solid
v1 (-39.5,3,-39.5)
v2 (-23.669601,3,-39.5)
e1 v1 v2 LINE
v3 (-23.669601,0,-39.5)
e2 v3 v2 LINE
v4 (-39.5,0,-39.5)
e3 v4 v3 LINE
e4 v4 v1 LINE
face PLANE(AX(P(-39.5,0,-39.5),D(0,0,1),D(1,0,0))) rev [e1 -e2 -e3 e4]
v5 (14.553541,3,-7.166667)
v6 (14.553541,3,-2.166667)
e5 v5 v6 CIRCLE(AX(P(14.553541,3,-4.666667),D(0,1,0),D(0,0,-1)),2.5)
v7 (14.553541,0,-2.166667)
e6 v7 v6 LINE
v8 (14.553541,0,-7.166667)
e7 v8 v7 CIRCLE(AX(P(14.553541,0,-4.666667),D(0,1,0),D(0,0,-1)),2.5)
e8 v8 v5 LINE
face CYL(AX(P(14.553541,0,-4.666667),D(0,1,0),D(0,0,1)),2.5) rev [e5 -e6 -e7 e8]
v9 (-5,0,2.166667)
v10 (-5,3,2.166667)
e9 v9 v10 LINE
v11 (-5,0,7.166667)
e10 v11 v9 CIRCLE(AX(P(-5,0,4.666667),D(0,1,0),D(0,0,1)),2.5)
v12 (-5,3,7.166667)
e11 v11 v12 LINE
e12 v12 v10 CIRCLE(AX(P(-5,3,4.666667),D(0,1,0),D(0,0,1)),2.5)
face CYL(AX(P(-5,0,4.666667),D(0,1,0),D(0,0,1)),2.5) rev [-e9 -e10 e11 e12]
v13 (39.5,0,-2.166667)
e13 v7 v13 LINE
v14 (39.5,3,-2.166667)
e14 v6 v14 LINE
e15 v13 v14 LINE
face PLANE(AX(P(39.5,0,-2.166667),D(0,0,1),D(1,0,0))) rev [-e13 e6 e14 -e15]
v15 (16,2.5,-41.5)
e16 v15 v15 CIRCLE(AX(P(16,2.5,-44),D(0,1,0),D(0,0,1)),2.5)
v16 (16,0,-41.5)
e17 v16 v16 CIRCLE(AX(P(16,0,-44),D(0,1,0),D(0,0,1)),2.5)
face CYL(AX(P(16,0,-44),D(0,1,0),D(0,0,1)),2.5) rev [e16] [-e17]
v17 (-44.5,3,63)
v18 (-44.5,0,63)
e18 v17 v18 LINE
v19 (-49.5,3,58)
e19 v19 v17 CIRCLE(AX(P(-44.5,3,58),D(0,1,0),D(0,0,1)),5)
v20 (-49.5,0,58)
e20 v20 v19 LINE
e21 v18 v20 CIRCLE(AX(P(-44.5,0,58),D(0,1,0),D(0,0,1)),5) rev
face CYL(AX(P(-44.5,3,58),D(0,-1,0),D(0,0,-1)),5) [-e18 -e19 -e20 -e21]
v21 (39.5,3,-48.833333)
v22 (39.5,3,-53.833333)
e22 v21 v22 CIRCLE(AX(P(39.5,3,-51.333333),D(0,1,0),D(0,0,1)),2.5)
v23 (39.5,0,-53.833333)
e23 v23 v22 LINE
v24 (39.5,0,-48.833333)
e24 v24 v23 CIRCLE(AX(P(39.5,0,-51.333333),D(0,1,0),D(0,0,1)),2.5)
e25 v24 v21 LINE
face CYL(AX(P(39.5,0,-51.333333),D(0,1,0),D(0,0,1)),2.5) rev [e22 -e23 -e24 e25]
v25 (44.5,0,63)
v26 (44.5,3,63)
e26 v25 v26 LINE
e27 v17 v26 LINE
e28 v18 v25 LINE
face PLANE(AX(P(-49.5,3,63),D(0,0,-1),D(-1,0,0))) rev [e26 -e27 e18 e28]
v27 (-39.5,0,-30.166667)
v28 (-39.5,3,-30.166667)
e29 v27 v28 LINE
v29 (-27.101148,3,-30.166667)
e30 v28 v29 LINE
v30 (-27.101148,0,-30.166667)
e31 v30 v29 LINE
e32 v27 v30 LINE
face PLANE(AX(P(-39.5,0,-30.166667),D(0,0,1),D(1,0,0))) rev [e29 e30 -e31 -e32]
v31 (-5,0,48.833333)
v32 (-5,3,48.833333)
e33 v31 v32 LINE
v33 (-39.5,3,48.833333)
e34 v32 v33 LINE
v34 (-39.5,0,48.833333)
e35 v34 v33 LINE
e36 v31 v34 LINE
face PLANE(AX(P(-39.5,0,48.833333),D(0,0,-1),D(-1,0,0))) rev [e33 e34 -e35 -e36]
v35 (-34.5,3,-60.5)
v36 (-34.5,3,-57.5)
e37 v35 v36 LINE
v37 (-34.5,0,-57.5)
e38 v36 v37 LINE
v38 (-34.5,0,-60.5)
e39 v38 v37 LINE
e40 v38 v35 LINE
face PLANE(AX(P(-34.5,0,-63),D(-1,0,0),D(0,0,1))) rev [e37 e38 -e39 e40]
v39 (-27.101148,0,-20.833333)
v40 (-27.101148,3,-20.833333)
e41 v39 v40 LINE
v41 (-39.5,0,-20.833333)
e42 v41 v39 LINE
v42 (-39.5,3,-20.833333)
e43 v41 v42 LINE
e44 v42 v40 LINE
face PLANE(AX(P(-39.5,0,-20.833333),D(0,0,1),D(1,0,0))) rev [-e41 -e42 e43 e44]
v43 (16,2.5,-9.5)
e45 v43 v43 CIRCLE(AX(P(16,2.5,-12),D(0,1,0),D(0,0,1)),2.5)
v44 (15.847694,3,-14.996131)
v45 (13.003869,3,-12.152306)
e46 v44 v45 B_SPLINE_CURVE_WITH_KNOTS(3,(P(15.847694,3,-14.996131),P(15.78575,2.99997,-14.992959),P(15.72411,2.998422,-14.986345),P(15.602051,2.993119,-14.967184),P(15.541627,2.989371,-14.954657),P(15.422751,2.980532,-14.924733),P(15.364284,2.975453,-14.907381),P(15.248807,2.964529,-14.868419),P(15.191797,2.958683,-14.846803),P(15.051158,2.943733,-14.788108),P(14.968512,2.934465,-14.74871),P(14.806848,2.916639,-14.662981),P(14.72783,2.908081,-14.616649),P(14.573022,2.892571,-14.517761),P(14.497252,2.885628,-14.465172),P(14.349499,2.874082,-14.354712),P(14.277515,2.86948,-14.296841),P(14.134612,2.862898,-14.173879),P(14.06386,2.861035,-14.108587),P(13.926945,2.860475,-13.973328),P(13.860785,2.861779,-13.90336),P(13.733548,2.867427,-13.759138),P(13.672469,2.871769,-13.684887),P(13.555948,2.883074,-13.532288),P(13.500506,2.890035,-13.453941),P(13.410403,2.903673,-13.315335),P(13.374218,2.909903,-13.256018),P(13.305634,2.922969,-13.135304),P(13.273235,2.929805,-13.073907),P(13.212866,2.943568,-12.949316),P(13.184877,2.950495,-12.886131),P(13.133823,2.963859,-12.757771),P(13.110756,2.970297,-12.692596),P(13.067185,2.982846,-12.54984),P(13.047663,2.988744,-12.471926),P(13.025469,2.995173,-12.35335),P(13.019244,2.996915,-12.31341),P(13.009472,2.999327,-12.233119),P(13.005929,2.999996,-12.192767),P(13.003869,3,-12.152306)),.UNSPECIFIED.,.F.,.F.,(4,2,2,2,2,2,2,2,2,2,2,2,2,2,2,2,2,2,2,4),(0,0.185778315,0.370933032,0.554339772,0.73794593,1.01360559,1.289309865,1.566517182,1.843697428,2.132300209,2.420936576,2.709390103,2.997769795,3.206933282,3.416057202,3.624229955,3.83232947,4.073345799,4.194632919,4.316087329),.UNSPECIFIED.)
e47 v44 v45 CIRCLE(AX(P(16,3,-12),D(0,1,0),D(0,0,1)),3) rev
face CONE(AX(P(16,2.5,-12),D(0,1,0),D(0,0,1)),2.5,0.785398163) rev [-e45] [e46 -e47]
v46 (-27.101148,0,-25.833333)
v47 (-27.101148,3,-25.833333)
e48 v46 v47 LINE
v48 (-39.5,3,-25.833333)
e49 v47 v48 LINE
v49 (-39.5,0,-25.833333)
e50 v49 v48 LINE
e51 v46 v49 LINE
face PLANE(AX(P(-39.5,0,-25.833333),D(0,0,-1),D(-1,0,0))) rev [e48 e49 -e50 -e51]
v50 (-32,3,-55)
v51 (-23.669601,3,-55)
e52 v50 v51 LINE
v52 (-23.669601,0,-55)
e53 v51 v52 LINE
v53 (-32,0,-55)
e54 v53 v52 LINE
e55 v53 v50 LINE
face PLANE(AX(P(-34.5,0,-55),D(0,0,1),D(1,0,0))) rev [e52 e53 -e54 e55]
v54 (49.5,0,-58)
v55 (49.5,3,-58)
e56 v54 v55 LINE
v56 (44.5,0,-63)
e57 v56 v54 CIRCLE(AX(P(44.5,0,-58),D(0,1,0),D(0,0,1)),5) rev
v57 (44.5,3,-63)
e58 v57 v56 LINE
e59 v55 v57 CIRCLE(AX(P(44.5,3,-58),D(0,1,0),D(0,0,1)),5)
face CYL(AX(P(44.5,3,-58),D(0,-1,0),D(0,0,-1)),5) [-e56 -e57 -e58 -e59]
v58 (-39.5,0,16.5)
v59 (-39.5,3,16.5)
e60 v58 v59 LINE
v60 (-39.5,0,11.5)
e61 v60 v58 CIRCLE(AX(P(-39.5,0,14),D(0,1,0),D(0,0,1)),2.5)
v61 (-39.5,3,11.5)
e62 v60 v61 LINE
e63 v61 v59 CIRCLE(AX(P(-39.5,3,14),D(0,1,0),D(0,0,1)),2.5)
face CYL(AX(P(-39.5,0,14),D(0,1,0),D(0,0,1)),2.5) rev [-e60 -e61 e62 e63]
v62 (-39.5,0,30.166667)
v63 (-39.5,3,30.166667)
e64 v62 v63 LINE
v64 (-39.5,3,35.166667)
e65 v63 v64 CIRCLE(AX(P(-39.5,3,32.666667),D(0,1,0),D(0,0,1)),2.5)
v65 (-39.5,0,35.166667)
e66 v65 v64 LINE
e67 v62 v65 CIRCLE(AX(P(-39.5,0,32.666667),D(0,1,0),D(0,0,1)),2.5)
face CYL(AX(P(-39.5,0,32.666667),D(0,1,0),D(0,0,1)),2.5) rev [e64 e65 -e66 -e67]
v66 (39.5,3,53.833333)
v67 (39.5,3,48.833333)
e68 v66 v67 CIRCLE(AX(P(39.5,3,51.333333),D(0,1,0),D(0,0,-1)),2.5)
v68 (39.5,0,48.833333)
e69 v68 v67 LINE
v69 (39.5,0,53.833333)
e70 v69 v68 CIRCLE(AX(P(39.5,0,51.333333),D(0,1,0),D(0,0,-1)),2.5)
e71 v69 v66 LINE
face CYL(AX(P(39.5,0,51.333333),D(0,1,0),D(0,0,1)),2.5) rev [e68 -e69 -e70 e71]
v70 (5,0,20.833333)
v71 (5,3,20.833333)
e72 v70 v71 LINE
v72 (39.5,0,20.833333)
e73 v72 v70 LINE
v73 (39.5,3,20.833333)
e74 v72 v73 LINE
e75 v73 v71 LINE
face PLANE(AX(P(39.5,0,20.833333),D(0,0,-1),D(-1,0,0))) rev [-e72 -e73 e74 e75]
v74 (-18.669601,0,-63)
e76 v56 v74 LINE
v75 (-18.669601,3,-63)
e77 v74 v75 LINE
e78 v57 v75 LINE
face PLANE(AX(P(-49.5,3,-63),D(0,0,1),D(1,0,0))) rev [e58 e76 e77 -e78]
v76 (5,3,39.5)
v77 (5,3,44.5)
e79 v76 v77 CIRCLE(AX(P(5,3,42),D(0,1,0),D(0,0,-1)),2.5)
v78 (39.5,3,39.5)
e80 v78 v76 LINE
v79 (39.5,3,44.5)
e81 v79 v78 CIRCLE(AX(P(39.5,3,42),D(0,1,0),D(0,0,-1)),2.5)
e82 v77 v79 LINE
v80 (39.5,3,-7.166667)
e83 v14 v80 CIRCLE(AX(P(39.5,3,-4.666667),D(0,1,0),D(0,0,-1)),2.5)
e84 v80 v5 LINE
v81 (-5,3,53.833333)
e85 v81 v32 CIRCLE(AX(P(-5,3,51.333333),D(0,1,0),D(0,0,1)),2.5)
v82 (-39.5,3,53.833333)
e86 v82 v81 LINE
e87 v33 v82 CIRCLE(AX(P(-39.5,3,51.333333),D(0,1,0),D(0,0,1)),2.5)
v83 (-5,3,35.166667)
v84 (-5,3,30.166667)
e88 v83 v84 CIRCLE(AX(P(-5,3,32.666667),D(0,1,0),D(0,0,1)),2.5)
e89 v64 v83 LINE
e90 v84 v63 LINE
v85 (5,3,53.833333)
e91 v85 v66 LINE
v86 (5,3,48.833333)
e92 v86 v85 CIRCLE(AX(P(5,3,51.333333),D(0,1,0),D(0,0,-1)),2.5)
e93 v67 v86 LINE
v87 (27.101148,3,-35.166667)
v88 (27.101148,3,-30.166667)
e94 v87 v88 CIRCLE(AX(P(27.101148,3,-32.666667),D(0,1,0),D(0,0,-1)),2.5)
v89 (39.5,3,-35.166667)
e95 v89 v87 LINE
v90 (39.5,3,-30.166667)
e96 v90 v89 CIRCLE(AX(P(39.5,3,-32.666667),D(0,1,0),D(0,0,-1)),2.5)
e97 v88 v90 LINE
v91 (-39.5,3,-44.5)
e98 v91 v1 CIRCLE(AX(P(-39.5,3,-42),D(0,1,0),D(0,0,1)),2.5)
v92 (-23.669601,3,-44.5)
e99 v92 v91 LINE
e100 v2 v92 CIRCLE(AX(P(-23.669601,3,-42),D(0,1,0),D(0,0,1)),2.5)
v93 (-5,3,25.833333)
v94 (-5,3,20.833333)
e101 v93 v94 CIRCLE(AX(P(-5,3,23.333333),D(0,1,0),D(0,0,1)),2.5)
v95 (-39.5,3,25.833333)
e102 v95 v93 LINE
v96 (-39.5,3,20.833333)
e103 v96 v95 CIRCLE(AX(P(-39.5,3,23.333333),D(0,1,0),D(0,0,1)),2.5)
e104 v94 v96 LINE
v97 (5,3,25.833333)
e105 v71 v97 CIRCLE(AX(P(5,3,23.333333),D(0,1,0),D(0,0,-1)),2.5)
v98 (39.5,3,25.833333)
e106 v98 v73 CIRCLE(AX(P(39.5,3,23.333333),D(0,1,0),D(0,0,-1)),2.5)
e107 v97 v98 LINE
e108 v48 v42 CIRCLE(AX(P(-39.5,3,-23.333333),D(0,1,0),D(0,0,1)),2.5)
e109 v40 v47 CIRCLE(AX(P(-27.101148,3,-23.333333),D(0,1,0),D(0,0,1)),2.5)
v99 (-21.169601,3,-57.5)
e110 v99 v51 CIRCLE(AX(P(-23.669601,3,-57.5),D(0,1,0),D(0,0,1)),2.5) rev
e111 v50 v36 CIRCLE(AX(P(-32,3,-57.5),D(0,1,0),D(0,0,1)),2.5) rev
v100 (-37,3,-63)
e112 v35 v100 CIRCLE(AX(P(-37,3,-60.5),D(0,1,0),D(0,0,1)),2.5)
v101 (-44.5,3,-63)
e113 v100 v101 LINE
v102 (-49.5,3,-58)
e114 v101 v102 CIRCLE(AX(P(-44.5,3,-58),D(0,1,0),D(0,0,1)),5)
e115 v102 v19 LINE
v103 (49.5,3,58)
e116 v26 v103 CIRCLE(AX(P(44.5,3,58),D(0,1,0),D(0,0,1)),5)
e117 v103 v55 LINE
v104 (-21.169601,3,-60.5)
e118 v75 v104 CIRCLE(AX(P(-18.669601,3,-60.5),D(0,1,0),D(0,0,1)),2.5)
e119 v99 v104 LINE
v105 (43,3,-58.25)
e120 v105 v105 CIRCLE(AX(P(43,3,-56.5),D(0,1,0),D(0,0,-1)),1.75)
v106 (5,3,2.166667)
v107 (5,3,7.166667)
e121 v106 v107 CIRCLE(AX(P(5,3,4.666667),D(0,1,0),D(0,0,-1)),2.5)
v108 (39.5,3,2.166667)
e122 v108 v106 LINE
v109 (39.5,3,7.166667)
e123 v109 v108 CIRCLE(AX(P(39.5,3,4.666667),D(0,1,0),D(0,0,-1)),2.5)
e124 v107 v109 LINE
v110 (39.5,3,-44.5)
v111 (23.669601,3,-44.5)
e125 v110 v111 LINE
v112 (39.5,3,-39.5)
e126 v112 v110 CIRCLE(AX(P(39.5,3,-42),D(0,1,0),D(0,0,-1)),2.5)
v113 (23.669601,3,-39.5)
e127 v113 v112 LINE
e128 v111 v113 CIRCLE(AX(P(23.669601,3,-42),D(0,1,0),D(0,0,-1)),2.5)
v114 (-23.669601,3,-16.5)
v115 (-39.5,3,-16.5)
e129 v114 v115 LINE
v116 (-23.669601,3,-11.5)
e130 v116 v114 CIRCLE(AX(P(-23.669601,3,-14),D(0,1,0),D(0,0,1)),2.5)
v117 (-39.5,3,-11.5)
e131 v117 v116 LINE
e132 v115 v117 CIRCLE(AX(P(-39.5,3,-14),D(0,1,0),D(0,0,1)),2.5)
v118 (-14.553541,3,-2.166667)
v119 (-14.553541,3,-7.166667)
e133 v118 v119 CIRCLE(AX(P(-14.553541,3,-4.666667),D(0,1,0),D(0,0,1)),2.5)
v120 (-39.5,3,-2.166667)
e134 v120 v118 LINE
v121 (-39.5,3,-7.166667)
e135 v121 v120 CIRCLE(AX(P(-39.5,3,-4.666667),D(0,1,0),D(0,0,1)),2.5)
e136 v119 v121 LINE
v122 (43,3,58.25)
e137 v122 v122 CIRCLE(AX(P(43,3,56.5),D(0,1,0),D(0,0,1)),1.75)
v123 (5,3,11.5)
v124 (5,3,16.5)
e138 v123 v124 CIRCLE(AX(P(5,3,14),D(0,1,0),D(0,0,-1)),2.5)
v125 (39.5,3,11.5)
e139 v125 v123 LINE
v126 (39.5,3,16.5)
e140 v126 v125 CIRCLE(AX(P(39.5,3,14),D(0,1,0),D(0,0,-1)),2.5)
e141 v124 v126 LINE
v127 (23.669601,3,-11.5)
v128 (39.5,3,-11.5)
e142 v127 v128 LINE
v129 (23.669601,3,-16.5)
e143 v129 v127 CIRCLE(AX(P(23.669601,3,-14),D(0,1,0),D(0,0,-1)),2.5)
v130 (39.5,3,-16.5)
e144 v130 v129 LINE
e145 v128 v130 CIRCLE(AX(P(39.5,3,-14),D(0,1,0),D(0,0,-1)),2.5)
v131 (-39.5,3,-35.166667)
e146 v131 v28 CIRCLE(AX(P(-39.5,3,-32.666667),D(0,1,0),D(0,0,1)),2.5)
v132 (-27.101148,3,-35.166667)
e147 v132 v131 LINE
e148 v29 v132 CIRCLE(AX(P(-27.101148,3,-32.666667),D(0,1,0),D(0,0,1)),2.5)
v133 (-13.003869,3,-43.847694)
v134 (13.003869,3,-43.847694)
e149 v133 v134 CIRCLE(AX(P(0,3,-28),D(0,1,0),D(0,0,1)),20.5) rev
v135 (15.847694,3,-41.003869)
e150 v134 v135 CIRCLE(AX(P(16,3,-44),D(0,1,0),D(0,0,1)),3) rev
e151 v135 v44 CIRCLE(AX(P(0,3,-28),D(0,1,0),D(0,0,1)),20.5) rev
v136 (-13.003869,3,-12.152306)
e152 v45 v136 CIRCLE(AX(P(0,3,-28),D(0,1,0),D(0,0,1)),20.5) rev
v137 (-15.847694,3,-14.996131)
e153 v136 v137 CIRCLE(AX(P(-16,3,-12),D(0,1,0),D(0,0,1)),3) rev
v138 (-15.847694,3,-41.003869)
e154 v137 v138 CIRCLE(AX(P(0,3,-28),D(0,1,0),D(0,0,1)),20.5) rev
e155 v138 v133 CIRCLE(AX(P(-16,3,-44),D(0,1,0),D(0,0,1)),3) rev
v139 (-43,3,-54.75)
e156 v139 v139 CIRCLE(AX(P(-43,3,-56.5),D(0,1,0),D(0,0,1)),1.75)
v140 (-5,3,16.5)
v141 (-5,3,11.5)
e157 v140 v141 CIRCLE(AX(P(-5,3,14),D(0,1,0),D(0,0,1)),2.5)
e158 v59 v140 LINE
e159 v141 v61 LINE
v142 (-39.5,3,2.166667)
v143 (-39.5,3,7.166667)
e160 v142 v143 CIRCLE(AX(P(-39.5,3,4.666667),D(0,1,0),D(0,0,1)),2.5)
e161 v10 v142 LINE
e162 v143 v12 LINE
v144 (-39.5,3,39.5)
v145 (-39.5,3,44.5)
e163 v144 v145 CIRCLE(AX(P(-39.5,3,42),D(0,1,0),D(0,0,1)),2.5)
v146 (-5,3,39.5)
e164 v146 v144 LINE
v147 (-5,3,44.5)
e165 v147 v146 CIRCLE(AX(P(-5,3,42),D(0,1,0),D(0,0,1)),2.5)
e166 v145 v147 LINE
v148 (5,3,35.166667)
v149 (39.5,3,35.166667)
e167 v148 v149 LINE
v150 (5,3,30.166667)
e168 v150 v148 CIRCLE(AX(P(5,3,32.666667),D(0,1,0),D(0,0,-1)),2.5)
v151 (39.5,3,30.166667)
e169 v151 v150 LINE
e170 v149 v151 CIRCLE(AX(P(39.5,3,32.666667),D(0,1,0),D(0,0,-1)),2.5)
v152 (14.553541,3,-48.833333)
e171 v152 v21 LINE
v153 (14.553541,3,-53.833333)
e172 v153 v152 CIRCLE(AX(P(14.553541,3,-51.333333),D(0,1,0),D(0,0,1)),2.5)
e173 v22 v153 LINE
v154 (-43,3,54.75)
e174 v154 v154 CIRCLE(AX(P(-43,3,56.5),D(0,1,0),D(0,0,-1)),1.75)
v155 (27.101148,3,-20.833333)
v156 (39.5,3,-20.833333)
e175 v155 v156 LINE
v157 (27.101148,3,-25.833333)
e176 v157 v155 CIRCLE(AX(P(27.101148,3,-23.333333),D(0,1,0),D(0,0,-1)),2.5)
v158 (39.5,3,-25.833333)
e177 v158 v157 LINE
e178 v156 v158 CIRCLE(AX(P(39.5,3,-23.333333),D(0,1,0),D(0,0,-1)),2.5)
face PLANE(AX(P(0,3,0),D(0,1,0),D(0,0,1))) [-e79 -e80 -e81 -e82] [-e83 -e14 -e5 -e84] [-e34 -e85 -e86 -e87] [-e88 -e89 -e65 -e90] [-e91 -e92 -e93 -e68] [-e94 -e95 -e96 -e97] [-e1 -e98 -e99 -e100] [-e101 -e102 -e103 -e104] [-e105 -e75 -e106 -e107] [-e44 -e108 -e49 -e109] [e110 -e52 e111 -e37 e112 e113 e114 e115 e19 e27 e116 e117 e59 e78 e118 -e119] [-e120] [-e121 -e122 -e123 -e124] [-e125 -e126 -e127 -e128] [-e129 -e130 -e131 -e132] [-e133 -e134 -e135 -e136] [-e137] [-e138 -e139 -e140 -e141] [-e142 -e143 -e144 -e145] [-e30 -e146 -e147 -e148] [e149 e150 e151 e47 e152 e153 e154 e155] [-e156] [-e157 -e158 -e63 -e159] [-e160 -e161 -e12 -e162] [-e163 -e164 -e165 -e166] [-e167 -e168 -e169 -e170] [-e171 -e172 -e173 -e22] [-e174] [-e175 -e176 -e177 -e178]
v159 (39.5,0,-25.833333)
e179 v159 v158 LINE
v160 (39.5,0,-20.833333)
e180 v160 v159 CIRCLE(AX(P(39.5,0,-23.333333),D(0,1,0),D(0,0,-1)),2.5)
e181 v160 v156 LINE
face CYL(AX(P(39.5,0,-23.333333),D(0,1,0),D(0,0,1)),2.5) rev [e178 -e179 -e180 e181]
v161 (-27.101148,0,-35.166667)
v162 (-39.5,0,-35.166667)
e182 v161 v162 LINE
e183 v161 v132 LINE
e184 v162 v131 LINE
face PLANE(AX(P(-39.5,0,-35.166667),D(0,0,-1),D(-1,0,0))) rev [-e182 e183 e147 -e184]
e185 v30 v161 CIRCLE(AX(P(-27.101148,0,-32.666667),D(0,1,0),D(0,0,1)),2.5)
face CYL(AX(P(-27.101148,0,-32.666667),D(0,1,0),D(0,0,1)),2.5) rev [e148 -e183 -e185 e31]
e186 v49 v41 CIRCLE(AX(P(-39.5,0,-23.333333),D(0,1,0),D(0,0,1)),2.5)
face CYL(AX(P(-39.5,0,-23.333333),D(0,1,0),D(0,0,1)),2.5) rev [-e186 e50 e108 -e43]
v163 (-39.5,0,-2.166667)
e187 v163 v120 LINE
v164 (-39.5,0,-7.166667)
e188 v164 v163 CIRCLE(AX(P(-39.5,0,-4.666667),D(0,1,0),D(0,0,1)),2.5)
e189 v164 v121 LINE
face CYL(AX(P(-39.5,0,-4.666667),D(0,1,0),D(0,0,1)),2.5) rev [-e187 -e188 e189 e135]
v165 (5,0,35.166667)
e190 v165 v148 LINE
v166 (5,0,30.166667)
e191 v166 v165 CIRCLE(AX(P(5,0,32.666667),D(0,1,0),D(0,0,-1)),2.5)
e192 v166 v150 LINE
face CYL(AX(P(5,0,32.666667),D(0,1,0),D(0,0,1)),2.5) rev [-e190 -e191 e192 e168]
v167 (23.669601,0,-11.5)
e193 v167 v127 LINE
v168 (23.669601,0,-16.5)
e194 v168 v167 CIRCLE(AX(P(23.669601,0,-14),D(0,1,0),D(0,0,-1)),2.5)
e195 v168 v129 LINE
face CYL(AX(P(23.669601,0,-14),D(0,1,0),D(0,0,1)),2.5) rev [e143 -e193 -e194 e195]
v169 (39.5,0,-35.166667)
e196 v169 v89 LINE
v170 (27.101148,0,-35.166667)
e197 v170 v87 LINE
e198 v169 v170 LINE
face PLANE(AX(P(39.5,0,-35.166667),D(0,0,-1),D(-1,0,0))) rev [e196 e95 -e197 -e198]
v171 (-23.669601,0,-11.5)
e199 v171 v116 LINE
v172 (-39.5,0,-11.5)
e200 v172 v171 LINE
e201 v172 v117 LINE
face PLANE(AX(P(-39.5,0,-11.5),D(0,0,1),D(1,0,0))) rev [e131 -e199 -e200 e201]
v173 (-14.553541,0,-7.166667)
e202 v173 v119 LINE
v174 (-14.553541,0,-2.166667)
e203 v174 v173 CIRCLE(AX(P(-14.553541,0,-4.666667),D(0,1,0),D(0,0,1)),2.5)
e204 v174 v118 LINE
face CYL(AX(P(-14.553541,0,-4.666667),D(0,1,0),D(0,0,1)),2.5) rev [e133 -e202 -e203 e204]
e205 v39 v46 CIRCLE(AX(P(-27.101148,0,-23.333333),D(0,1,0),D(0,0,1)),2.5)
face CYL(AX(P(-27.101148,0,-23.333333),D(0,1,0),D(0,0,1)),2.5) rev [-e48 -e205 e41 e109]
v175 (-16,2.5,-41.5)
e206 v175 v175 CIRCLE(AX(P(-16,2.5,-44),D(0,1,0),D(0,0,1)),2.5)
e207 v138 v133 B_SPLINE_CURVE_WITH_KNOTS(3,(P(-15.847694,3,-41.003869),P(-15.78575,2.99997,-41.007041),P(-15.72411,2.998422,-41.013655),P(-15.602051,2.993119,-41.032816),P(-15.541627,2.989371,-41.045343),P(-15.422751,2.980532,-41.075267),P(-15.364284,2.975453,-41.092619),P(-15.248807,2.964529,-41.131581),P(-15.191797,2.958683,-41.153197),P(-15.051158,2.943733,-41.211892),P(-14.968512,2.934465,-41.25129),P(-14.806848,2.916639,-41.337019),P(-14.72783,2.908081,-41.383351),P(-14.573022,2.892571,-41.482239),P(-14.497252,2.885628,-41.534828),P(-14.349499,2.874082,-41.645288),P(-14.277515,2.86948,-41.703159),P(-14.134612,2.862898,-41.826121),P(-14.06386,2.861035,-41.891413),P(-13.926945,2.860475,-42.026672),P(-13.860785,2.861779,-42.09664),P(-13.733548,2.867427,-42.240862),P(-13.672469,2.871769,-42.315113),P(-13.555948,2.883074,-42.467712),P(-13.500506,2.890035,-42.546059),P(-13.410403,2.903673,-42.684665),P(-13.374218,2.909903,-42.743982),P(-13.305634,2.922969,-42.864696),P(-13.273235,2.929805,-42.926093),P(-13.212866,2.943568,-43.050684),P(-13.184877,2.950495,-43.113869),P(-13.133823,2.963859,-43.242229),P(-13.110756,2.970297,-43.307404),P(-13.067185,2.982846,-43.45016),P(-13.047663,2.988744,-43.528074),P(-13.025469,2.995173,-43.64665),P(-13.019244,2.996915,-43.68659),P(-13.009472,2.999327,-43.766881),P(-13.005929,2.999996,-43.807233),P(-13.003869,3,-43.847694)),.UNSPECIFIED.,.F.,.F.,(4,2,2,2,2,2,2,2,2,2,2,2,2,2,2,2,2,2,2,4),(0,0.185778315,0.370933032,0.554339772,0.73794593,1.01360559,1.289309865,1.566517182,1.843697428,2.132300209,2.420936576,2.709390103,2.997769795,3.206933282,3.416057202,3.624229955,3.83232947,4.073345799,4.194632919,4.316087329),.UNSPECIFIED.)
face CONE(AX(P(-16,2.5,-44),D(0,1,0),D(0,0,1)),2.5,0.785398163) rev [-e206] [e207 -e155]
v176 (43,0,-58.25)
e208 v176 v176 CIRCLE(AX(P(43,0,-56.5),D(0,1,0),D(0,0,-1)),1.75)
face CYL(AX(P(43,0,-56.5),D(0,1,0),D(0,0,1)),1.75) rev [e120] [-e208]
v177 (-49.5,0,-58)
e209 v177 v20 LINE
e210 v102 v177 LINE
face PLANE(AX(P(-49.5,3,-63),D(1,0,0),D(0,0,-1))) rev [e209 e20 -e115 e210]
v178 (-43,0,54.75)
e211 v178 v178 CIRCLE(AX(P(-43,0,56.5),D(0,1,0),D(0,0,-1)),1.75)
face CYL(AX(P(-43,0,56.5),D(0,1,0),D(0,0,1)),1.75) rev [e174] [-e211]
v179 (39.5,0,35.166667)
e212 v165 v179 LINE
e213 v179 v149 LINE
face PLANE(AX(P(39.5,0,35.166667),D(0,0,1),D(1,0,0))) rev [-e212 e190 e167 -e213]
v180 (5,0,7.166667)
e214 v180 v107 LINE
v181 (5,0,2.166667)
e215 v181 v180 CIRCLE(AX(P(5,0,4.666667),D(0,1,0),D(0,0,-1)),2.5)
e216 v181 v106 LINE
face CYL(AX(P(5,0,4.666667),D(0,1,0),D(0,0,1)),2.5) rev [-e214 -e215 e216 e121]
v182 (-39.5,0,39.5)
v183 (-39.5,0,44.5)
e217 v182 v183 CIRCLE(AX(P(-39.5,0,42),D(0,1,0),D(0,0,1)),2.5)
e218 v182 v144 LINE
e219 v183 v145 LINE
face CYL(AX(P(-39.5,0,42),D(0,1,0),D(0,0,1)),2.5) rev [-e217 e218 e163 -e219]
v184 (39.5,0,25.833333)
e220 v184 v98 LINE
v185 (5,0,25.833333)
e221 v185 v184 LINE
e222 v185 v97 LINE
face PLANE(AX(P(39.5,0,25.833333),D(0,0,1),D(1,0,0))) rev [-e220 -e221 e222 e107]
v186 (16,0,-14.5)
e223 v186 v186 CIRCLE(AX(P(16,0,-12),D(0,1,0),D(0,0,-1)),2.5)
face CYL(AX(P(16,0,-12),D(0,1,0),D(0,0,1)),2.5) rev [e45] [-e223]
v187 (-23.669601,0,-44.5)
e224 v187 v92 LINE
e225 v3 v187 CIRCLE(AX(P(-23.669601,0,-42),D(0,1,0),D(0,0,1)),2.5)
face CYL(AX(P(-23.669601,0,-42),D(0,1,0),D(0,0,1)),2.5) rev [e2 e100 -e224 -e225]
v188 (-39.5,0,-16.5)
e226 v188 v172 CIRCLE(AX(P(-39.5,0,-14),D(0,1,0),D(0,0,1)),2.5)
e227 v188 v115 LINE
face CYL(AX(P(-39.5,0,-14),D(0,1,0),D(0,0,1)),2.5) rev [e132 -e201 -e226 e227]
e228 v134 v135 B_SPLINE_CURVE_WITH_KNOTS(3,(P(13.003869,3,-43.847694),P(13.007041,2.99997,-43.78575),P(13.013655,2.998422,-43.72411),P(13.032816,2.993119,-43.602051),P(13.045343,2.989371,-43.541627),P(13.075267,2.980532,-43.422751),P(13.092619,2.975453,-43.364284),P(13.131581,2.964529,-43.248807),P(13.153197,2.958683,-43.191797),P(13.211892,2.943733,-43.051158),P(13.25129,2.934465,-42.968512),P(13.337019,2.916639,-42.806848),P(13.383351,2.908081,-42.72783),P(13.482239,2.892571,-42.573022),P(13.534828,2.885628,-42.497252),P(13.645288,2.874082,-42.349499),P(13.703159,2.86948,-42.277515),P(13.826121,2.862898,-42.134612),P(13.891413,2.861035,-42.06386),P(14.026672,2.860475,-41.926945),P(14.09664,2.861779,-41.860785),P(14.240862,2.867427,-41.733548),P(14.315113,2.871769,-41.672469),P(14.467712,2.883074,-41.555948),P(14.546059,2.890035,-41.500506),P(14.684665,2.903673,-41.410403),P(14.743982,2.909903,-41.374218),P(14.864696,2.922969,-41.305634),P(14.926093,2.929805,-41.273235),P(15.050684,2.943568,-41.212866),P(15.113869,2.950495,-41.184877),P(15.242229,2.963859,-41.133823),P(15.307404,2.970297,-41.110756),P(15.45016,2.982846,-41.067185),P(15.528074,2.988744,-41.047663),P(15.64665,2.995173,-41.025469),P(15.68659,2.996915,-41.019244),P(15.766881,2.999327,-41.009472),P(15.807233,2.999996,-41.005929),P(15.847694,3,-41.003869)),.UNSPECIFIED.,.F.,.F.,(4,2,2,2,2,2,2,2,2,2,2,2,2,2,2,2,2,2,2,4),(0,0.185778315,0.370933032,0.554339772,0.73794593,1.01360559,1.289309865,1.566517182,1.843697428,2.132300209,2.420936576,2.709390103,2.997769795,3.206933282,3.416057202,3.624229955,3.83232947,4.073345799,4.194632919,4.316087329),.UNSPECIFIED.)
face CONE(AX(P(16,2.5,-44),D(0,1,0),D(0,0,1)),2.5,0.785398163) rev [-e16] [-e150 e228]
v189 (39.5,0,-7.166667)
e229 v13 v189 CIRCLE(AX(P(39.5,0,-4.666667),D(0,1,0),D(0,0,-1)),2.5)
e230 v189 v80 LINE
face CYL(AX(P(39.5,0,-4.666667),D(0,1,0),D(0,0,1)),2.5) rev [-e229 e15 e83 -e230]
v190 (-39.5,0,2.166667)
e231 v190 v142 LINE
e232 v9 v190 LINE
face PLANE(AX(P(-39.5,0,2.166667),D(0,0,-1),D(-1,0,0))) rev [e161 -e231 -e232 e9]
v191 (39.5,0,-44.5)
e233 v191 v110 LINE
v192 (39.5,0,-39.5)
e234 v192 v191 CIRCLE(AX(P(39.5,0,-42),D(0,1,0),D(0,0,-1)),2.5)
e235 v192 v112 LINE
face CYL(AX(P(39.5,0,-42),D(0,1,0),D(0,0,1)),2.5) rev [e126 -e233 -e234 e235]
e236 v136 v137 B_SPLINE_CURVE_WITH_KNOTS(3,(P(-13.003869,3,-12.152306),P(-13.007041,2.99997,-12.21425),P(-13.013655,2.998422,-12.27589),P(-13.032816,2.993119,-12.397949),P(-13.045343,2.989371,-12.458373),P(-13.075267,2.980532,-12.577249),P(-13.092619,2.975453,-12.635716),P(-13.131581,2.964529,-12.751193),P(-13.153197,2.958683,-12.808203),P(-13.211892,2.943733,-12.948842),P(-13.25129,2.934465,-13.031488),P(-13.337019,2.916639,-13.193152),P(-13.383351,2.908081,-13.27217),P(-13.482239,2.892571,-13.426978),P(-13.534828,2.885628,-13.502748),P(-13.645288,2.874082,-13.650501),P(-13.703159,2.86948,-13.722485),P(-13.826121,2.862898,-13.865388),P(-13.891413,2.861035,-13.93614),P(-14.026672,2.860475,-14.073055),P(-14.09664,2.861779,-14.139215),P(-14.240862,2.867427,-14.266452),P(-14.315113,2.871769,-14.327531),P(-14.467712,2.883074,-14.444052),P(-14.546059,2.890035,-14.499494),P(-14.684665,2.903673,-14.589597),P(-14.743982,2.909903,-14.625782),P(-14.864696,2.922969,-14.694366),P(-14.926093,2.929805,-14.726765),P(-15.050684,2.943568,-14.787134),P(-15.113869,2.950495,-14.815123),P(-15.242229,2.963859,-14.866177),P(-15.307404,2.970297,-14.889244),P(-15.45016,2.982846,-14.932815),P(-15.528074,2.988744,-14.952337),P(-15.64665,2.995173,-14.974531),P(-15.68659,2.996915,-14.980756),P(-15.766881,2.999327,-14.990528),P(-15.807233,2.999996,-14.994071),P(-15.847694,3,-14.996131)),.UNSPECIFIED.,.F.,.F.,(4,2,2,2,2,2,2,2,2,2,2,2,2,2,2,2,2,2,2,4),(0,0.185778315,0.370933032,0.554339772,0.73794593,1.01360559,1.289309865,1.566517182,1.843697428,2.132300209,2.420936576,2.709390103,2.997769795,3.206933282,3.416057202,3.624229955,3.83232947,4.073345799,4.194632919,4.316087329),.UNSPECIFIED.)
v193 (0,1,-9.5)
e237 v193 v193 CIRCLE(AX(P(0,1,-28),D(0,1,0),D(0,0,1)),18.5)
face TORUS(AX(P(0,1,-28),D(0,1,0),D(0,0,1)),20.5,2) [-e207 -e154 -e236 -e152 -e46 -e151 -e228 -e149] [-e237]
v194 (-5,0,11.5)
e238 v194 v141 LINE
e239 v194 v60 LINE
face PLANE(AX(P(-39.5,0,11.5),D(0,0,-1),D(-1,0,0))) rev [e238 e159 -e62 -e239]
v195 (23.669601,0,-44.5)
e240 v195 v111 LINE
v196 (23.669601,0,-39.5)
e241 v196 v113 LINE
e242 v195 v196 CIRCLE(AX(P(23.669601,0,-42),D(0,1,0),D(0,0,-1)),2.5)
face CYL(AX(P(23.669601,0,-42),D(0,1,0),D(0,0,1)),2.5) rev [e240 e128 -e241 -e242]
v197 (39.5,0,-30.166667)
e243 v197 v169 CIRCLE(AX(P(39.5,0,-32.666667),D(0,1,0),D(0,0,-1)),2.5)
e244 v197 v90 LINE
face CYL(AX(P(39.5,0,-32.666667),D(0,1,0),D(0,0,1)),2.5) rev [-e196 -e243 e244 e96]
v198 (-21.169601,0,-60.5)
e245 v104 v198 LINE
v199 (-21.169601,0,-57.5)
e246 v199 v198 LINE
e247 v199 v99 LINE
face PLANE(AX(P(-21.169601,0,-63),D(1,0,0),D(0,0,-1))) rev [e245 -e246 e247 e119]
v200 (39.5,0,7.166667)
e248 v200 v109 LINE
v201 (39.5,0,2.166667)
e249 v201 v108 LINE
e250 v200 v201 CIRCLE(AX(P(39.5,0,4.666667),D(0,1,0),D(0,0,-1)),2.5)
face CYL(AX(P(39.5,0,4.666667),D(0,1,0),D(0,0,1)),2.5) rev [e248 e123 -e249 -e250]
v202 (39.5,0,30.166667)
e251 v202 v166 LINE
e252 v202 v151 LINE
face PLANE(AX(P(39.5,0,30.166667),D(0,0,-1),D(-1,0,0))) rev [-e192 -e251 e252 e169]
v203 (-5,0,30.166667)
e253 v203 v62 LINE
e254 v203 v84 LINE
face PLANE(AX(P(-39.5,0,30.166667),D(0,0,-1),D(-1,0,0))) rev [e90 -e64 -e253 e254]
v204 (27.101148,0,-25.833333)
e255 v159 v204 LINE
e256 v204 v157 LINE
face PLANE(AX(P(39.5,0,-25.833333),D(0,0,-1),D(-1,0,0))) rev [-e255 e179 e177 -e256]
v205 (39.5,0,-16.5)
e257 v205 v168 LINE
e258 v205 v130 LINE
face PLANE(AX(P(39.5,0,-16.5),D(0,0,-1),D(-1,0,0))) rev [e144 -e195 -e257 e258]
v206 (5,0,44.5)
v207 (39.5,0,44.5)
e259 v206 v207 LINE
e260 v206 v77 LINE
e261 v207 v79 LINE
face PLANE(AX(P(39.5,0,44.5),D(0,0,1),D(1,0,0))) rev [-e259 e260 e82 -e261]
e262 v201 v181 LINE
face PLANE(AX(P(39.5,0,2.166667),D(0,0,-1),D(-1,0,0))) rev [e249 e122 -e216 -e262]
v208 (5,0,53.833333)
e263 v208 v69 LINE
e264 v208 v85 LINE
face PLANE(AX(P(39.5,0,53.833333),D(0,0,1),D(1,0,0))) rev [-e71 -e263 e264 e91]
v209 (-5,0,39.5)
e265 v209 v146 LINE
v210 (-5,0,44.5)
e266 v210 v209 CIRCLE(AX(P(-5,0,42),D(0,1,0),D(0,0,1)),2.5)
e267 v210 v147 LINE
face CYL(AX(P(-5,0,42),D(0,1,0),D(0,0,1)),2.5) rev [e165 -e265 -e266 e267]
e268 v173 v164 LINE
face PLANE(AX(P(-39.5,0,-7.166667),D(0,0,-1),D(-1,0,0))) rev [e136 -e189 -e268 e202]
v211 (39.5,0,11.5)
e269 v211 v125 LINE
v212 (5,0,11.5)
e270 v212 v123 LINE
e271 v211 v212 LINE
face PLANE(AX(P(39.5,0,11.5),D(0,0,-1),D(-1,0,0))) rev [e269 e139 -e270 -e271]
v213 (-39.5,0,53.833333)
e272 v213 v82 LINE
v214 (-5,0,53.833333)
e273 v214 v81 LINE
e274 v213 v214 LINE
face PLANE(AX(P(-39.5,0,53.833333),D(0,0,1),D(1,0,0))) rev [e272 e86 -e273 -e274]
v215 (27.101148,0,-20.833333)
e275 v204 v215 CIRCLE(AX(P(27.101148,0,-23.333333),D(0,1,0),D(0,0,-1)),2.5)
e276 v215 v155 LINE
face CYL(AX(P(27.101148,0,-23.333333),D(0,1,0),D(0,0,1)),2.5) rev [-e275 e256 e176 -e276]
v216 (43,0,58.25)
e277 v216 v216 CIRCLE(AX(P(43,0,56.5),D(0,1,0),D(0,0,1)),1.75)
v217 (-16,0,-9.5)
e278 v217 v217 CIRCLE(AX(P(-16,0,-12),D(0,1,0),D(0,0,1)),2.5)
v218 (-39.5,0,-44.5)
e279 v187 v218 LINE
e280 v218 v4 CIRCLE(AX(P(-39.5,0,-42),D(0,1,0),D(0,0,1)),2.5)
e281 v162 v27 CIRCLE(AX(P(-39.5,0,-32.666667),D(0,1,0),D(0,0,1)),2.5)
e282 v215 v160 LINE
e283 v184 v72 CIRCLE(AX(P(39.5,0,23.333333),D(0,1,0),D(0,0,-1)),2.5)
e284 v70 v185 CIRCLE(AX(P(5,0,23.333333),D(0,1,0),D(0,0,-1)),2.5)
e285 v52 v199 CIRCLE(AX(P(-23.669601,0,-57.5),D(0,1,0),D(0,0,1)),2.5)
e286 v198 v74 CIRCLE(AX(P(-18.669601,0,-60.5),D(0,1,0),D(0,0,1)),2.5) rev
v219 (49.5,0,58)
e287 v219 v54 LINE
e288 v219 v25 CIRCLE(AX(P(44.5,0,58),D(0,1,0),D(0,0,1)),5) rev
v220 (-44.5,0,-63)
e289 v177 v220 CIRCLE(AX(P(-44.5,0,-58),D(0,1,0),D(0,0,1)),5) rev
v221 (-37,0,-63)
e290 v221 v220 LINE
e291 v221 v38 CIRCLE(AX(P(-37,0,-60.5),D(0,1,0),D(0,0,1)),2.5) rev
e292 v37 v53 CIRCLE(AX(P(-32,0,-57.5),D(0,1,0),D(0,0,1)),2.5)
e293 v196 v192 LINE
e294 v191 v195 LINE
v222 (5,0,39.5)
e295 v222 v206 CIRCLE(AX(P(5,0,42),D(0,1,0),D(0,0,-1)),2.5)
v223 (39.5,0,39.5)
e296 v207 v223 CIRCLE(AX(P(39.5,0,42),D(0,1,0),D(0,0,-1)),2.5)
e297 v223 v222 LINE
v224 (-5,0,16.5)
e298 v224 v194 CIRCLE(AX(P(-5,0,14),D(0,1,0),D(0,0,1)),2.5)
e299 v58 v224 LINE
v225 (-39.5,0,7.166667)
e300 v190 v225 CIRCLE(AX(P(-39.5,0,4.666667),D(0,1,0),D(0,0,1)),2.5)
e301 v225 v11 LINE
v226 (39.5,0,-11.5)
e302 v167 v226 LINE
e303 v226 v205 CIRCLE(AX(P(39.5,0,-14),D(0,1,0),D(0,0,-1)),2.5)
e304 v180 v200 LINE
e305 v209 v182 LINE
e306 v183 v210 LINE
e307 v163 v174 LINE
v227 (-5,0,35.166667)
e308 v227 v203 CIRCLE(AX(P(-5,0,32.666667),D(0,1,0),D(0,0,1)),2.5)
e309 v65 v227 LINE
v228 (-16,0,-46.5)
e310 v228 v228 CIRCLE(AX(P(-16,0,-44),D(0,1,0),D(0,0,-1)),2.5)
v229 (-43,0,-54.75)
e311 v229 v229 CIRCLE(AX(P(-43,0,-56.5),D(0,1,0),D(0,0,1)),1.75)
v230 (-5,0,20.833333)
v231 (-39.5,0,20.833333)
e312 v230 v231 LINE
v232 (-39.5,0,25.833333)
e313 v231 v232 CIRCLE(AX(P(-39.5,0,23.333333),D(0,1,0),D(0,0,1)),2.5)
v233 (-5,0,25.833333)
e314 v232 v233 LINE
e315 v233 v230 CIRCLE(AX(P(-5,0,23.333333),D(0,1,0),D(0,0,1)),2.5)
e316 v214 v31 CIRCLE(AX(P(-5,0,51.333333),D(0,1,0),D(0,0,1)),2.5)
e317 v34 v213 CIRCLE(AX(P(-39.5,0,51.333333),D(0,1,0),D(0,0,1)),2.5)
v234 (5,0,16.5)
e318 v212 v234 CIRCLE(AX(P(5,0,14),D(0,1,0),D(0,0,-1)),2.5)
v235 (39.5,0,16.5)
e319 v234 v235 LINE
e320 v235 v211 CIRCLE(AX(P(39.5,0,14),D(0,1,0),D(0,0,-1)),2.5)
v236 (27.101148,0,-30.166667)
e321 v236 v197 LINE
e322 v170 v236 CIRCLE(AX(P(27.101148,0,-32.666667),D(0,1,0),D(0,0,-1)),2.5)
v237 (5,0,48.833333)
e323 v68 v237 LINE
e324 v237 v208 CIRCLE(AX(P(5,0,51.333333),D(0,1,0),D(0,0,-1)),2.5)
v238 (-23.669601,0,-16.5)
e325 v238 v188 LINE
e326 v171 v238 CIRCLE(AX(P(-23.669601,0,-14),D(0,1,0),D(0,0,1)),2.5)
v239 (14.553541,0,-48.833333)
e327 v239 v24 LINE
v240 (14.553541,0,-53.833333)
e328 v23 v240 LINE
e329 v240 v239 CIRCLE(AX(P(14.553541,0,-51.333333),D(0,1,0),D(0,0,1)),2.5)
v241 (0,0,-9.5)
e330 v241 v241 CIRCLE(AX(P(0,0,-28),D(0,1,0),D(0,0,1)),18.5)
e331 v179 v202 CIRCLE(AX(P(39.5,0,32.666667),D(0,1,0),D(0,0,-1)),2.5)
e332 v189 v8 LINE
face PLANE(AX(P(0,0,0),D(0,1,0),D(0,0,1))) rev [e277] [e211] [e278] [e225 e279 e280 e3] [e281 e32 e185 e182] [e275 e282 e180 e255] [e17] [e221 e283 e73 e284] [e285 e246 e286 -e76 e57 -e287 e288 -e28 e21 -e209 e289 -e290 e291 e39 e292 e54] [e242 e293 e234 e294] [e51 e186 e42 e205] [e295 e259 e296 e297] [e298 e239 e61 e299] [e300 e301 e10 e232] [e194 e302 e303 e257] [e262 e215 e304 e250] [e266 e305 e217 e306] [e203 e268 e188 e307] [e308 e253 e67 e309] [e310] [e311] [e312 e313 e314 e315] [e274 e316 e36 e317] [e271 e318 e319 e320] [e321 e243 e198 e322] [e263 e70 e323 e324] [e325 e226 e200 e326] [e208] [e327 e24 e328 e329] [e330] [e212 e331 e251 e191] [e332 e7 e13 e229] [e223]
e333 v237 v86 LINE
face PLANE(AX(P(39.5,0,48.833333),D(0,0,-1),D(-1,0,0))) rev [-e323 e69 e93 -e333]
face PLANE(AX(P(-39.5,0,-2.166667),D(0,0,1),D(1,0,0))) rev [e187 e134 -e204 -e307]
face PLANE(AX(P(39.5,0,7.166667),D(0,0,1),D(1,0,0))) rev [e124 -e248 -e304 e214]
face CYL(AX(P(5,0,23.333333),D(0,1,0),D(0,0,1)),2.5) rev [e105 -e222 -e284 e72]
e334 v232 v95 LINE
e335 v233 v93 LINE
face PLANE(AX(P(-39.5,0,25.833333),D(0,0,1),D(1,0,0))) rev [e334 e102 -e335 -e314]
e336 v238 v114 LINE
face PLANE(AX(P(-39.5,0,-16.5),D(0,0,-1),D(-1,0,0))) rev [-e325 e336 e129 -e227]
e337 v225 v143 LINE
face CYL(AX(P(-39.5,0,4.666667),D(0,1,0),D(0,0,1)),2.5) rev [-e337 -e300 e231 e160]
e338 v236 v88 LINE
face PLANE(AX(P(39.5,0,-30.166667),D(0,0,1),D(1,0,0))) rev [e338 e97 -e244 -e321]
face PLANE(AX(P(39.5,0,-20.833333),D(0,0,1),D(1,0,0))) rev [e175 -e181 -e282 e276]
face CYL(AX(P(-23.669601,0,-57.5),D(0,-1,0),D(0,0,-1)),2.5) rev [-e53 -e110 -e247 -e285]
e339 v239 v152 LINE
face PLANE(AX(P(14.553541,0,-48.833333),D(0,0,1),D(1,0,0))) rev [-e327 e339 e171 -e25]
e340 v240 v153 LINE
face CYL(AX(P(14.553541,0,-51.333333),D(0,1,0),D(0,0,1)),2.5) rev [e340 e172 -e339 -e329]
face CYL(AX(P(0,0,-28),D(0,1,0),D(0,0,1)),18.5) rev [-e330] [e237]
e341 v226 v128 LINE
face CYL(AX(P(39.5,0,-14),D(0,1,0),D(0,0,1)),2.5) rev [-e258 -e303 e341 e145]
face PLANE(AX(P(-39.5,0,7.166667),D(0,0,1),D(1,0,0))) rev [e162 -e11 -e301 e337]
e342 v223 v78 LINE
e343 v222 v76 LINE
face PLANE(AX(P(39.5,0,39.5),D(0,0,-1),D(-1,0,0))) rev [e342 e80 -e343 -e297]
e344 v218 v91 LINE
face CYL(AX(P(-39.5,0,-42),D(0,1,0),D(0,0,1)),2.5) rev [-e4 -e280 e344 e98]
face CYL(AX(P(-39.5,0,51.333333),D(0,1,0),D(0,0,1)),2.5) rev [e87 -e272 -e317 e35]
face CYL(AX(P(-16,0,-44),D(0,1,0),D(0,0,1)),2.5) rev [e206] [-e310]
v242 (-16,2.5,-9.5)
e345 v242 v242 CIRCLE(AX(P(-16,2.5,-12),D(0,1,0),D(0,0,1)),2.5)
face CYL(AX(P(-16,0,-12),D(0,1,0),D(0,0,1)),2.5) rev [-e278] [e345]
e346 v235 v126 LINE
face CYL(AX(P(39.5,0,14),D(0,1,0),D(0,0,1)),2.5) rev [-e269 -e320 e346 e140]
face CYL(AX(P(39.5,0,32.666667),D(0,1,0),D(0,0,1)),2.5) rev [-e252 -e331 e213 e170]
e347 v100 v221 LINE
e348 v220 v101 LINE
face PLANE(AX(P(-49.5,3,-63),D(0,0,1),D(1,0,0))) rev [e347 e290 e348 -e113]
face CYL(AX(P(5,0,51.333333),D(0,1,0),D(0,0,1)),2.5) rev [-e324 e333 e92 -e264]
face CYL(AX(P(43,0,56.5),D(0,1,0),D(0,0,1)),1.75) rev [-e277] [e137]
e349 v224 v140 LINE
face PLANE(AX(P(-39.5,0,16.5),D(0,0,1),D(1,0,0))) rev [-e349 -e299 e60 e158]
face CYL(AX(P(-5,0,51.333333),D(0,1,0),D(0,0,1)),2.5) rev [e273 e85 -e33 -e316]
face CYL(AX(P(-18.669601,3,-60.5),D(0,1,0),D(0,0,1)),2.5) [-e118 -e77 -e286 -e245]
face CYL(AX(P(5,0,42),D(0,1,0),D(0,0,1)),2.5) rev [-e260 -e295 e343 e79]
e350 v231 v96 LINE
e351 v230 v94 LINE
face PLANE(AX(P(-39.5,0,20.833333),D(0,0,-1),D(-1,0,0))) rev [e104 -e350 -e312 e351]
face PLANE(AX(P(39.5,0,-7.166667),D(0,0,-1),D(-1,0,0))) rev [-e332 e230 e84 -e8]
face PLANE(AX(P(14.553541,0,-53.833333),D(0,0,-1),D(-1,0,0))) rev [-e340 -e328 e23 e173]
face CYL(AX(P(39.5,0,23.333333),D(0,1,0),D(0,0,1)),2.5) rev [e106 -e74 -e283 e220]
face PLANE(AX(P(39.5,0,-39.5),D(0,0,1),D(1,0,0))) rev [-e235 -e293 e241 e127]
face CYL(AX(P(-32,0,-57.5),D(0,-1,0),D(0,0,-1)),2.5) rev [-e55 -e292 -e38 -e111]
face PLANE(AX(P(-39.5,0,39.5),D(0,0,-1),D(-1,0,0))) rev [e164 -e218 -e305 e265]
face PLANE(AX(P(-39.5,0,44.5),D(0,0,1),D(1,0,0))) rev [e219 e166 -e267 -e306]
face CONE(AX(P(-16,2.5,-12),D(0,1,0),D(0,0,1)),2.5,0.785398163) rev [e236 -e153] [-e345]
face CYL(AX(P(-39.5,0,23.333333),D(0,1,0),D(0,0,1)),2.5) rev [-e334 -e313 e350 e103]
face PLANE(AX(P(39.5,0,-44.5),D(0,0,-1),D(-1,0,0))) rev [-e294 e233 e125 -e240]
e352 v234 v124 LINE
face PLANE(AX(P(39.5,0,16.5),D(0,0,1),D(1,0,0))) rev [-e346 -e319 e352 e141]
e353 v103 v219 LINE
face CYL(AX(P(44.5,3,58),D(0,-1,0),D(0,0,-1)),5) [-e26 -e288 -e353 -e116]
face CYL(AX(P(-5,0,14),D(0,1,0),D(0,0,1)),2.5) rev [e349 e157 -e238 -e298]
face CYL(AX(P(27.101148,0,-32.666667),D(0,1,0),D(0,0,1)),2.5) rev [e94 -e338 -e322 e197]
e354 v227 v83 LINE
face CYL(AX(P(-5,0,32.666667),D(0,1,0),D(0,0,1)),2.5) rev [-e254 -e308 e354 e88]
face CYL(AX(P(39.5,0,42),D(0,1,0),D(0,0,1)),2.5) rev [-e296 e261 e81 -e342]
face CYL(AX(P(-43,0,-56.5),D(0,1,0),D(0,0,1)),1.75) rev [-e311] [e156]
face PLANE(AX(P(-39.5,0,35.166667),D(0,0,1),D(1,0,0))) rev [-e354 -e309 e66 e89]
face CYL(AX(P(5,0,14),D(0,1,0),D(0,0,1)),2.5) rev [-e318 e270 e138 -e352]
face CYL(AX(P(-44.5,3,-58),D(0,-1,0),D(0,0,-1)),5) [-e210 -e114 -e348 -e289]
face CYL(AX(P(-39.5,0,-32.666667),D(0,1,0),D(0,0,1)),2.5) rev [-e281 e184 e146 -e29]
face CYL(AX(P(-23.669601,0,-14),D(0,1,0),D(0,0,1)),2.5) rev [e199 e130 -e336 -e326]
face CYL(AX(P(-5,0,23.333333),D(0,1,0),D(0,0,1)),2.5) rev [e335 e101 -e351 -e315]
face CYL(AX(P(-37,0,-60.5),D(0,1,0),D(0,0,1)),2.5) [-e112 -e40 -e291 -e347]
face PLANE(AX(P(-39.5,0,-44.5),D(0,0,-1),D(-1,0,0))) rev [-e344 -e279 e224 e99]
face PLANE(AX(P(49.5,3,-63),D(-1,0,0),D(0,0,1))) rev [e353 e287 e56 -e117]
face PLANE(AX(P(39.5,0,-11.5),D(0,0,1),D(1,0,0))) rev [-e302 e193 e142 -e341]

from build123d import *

# Parameters (mm, degrees)
SKETCH1_W           = 99
SKETCH1_H           = 126
BOSS_EXTRUDE1_DEPTH = 3
FILLET1_R           = 5
SKETCH5_R           = 18.5
SKETCH5_R_2         = 2.5
CUT_EXTRUDE4_DEPTH  = 81.176368089
SKETCH2_R           = 1.75
CUT_EXTRUDE1_DEPTH  = 81.176368089
CHAMFER1_SIZE       = 0.5
FILLET3_R           = 2
CUT_EXTRUDE3_DEPTH  = 81.176368089
SKETCH3_W           = 13.330399243
SKETCH3_H           = 8
CUT_EXTRUDE2_DEPTH  = 81.176368089
FILLET2_R           = 2.5


with BuildPart() as part:
    # Sketch1 → Boss-Extrude1 (new body)
    with BuildSketch(Plane(origin=(0, 0, 0), x_dir=(1, 0, 0), z_dir=(0, 1, 0))):
        Rectangle(SKETCH1_W, SKETCH1_H)
    extrude(amount=BOSS_EXTRUDE1_DEPTH)

    # Fillet1
    fillet1_edges = [part.edges().sort_by_distance(p)[0] for p in [
        (49.5, 1.5, 63),
        (-49.5, 1.5, 63),
        (-49.5, 1.5, -63),
        (49.5, 1.5, -63),
    ]]
    fillet(fillet1_edges, radius=FILLET1_R)

    # Sketch5 → Cut-Extrude4 (cut, through all)
    with BuildSketch(Plane(origin=(0, 3, 0), x_dir=(1, 0, 0), z_dir=(0, 1, 0))):
        with Locations(Location((0, 28, 0), (0, 0, 270))):
            Circle(SKETCH5_R)
        with Locations(Location((16, 44, 0), (0, 0, 270))):
            Circle(SKETCH5_R_2)
        with Locations(Location((16, 12, 0), (0, 0, 90))):
            Circle(SKETCH5_R_2)
        with Locations(Location((-16, 12, 0), (0, 0, 270))):
            Circle(SKETCH5_R_2)
        with Locations(Location((-16, 44, 0), (0, 0, 90))):
            Circle(SKETCH5_R_2)
    extrude(amount=-CUT_EXTRUDE4_DEPTH, mode=Mode.SUBTRACT)

    # Sketch2 → Cut-Extrude1 (cut, through all)
    with BuildSketch(Plane(origin=(0, 3, 0), x_dir=(1, 0, 0), z_dir=(0, 1, 0))):
        with Locations(Location((-43, 56.5, 0), (0, 0, 270))):
            Circle(SKETCH2_R)
        with Locations(Location((43, 56.5, 0), (0, 0, 90))):
            Circle(SKETCH2_R)
        with Locations(Location((43, -56.5, 0), (0, 0, 270))):
            Circle(SKETCH2_R)
        with Locations(Location((-43, -56.5, 0), (0, 0, 90))):
            Circle(SKETCH2_R)
    extrude(amount=-CUT_EXTRUDE1_DEPTH, mode=Mode.SUBTRACT)

    # Chamfer1
    chamfer1_edges = [part.edges().sort_by_distance(p)[0] for p in [
        (-16, 3, -41.5),
        (-16, 3, -14.5),
        (16, 3, -9.5),
        (16, 3, -46.5),
    ]]
    chamfer(chamfer1_edges, length=CHAMFER1_SIZE)

    # Fillet3
    # the kernel refuses this fillet: 2 mm, written as the material it takes off along each edge
    with BuildSketch(Plane(origin=(0, 3, -28), x_dir=(0, 0, 1), z_dir=(-1, 0, 0))) as fillet3_piece_1:
        with BuildLine():
            CenterArc((18.5 + FILLET3_R, -FILLET3_R), FILLET3_R, 90, 90)
            Line((18.5, -FILLET3_R), (18.5, 0))
            Line((18.5, 0), (18.5 + FILLET3_R, 0))
        make_face()
    revolve(axis=Axis((0, 3, -28), (0, 1, 0)), mode=Mode.SUBTRACT)

    # Sketch4 → Cut-Extrude3 (cut, through all)
    with BuildSketch(Plane(origin=(0, 3, 0), x_dir=(1, 0, 0), z_dir=(0, 1, 0))):
        with BuildLine():
            Line((-39.5, -48.833333333), (-5, -48.833333333))
            ThreePointArc((-5, -48.833333333), (-2.5, -51.333333333), (-5, -53.833333333))
            Line((-5, -53.833333333), (-39.5, -53.833333333))
            ThreePointArc((-39.5, -53.833333333), (-42, -51.333333333), (-39.5, -48.833333333))
        make_face()
        with BuildLine():
            Line((-39.5, -39.5), (-5, -39.5))
            ThreePointArc((-5, -39.5), (-2.5, -42), (-5, -44.5))
            Line((-5, -44.5), (-39.5, -44.5))
            ThreePointArc((-39.5, -44.5), (-42, -42), (-39.5, -39.5))
        make_face()
        with BuildLine():
            Line((-39.5, -30.166666667), (-5, -30.166666667))
            ThreePointArc((-5, -30.166666667), (-2.5, -32.666666667), (-5, -35.166666667))
            Line((-5, -35.166666667), (-39.5, -35.166666667))
            ThreePointArc((-39.5, -35.166666667), (-42, -32.666666667), (-39.5, -30.166666667))
        make_face()
        with BuildLine():
            Line((-39.5, -20.833333333), (-5, -20.833333333))
            ThreePointArc((-5, -20.833333333), (-2.5, -23.333333333), (-5, -25.833333333))
            Line((-5, -25.833333333), (-39.5, -25.833333333))
            ThreePointArc((-39.5, -25.833333333), (-42, -23.333333333), (-39.5, -20.833333333))
        make_face()
        with BuildLine():
            Line((-39.5, -11.5), (-5, -11.5))
            ThreePointArc((-5, -11.5), (-2.5, -14), (-5, -16.5))
            Line((-5, -16.5), (-39.5, -16.5))
            ThreePointArc((-39.5, -16.5), (-42, -14), (-39.5, -11.5))
        make_face()
        with BuildLine():
            Line((-39.5, -2.166666667), (-5, -2.166666667))
            ThreePointArc((-5, -2.166666667), (-2.5, -4.666666667), (-5, -7.166666667))
            Line((-5, -7.166666667), (-39.5, -7.166666667))
            ThreePointArc((-39.5, -7.166666667), (-42, -4.666666667), (-39.5, -2.166666667))
        make_face()
        with BuildLine():
            Line((-39.5, 7.166666667), (-14.553540997, 7.166666667))
            ThreePointArc((-14.553540997, 7.166666667), (-12.053540997, 4.666666667), (-14.553540997, 2.166666667))
            Line((-14.553540997, 2.166666667), (-39.5, 2.166666667))
            ThreePointArc((-39.5, 2.166666667), (-42, 4.666666667), (-39.5, 7.166666667))
        make_face()
        with BuildLine():
            Line((-39.5, 16.5), (-23.669600757, 16.5))
            ThreePointArc((-23.669600757, 16.5), (-21.169600757, 14), (-23.669600757, 11.5))
            Line((-23.669600757, 11.5), (-39.5, 11.5))
            ThreePointArc((-39.5, 11.5), (-42, 14), (-39.5, 16.5))
        make_face()
        with BuildLine():
            Line((-39.5, 25.833333333), (-27.101147987, 25.833333333))
            ThreePointArc((-27.101147987, 25.833333333), (-24.601147987, 23.333333333), (-27.101147987, 20.833333333))
            Line((-27.101147987, 20.833333333), (-39.5, 20.833333333))
            ThreePointArc((-39.5, 20.833333333), (-42, 23.333333333), (-39.5, 25.833333333))
        make_face()
        with BuildLine():
            Line((-39.5, 35.166666667), (-27.101147987, 35.166666667))
            ThreePointArc((-27.101147987, 35.166666667), (-24.601147987, 32.666666667), (-27.101147987, 30.166666667))
            Line((-27.101147987, 30.166666667), (-39.5, 30.166666667))
            ThreePointArc((-39.5, 30.166666667), (-42, 32.666666667), (-39.5, 35.166666667))
        make_face()
        with BuildLine():
            Line((39.5, 44.5), (23.669600757, 44.5))
            ThreePointArc((23.669600757, 44.5), (21.169600757, 42), (23.669600757, 39.5))
            Line((23.669600757, 39.5), (39.5, 39.5))
            ThreePointArc((39.5, 39.5), (42, 42), (39.5, 44.5))
        make_face()
        with BuildLine():
            Line((-39.5, 44.5), (-23.669600757, 44.5))
            ThreePointArc((-23.669600757, 44.5), (-21.169600757, 42), (-23.669600757, 39.5))
            Line((-23.669600757, 39.5), (-39.5, 39.5))
            ThreePointArc((-39.5, 39.5), (-42, 42), (-39.5, 44.5))
        make_face()
        with BuildLine():
            Line((39.5, 35.166666667), (27.101147987, 35.166666667))
            ThreePointArc((27.101147987, 35.166666667), (24.601147987, 32.666666667), (27.101147987, 30.166666667))
            Line((27.101147987, 30.166666667), (39.5, 30.166666667))
            ThreePointArc((39.5, 30.166666667), (42, 32.666666667), (39.5, 35.166666667))
        make_face()
        with BuildLine():
            Line((39.5, 25.833333333), (27.101147987, 25.833333333))
            ThreePointArc((27.101147987, 25.833333333), (24.601147987, 23.333333333), (27.101147987, 20.833333333))
            Line((27.101147987, 20.833333333), (39.5, 20.833333333))
            ThreePointArc((39.5, 20.833333333), (42, 23.333333333), (39.5, 25.833333333))
        make_face()
        with BuildLine():
            Line((39.5, 16.5), (23.669600757, 16.5))
            ThreePointArc((23.669600757, 16.5), (21.169600757, 14), (23.669600757, 11.5))
            Line((23.669600757, 11.5), (39.5, 11.5))
            ThreePointArc((39.5, 11.5), (42, 14), (39.5, 16.5))
        make_face()
        with BuildLine():
            Line((39.5, 7.166666667), (14.553540997, 7.166666667))
            ThreePointArc((14.553540997, 7.166666667), (12.053540997, 4.666666667), (14.553540997, 2.166666667))
            Line((14.553540997, 2.166666667), (39.5, 2.166666667))
            ThreePointArc((39.5, 2.166666667), (42, 4.666666667), (39.5, 7.166666667))
        make_face()
        with BuildLine():
            Line((39.5, -2.166666667), (5, -2.166666667))
            ThreePointArc((5, -2.166666667), (2.5, -4.666666667), (5, -7.166666667))
            Line((5, -7.166666667), (39.5, -7.166666667))
            ThreePointArc((39.5, -7.166666667), (42, -4.666666667), (39.5, -2.166666667))
        make_face()
        with BuildLine():
            Line((39.5, -11.5), (5, -11.5))
            ThreePointArc((5, -11.5), (2.5, -14), (5, -16.5))
            Line((5, -16.5), (39.5, -16.5))
            ThreePointArc((39.5, -16.5), (42, -14), (39.5, -11.5))
        make_face()
        with BuildLine():
            Line((39.5, -20.833333333), (5, -20.833333333))
            ThreePointArc((5, -20.833333333), (2.5, -23.333333333), (5, -25.833333333))
            Line((5, -25.833333333), (39.5, -25.833333333))
            ThreePointArc((39.5, -25.833333333), (42, -23.333333333), (39.5, -20.833333333))
        make_face()
        with BuildLine():
            Line((39.5, -30.166666667), (5, -30.166666667))
            ThreePointArc((5, -30.166666667), (2.5, -32.666666667), (5, -35.166666667))
            Line((5, -35.166666667), (39.5, -35.166666667))
            ThreePointArc((39.5, -35.166666667), (42, -32.666666667), (39.5, -30.166666667))
        make_face()
        with BuildLine():
            Line((39.5, -39.5), (5, -39.5))
            ThreePointArc((5, -39.5), (2.5, -42), (5, -44.5))
            Line((5, -44.5), (39.5, -44.5))
            ThreePointArc((39.5, -44.5), (42, -42), (39.5, -39.5))
        make_face()
        with BuildLine():
            Line((39.5, -48.833333333), (5, -48.833333333))
            ThreePointArc((5, -48.833333333), (2.5, -51.333333333), (5, -53.833333333))
            Line((5, -53.833333333), (39.5, -53.833333333))
            ThreePointArc((39.5, -53.833333333), (42, -51.333333333), (39.5, -48.833333333))
        make_face()
        with BuildLine():
            Line((14.553540997, 53.833333333), (39.5, 53.833333333))
            ThreePointArc((39.5, 53.833333333), (42, 51.333333333), (39.5, 48.833333333))
            Line((39.5, 48.833333333), (14.553540997, 48.833333333))
            ThreePointArc((14.553540997, 48.833333333), (12.053540997, 51.333333333), (14.553540997, 53.833333333))
        make_face()
    extrude(amount=-CUT_EXTRUDE3_DEPTH, mode=Mode.SUBTRACT)

    # Sketch3 → Cut-Extrude2 (cut, through all)
    with BuildSketch(Plane(origin=(0, 3, 0), x_dir=(1, 0, 0), z_dir=(0, 1, 0))):
        with Locations((-27.834800378, 59)):
            Rectangle(SKETCH3_W, SKETCH3_H)
    extrude(amount=-CUT_EXTRUDE2_DEPTH, mode=Mode.SUBTRACT)

    # Fillet2
    fillet2_edges = [part.edges().sort_by_distance(p)[0] for p in [
        (-34.5, 1.5, -55),
        (-34.5, 1.5, -63),
        (-21.169600757, 1.5, -63),
        (-21.169600757, 1.5, -55),
    ]]
    fillet(fillet2_edges, radius=FILLET2_R)


solid = part.part
